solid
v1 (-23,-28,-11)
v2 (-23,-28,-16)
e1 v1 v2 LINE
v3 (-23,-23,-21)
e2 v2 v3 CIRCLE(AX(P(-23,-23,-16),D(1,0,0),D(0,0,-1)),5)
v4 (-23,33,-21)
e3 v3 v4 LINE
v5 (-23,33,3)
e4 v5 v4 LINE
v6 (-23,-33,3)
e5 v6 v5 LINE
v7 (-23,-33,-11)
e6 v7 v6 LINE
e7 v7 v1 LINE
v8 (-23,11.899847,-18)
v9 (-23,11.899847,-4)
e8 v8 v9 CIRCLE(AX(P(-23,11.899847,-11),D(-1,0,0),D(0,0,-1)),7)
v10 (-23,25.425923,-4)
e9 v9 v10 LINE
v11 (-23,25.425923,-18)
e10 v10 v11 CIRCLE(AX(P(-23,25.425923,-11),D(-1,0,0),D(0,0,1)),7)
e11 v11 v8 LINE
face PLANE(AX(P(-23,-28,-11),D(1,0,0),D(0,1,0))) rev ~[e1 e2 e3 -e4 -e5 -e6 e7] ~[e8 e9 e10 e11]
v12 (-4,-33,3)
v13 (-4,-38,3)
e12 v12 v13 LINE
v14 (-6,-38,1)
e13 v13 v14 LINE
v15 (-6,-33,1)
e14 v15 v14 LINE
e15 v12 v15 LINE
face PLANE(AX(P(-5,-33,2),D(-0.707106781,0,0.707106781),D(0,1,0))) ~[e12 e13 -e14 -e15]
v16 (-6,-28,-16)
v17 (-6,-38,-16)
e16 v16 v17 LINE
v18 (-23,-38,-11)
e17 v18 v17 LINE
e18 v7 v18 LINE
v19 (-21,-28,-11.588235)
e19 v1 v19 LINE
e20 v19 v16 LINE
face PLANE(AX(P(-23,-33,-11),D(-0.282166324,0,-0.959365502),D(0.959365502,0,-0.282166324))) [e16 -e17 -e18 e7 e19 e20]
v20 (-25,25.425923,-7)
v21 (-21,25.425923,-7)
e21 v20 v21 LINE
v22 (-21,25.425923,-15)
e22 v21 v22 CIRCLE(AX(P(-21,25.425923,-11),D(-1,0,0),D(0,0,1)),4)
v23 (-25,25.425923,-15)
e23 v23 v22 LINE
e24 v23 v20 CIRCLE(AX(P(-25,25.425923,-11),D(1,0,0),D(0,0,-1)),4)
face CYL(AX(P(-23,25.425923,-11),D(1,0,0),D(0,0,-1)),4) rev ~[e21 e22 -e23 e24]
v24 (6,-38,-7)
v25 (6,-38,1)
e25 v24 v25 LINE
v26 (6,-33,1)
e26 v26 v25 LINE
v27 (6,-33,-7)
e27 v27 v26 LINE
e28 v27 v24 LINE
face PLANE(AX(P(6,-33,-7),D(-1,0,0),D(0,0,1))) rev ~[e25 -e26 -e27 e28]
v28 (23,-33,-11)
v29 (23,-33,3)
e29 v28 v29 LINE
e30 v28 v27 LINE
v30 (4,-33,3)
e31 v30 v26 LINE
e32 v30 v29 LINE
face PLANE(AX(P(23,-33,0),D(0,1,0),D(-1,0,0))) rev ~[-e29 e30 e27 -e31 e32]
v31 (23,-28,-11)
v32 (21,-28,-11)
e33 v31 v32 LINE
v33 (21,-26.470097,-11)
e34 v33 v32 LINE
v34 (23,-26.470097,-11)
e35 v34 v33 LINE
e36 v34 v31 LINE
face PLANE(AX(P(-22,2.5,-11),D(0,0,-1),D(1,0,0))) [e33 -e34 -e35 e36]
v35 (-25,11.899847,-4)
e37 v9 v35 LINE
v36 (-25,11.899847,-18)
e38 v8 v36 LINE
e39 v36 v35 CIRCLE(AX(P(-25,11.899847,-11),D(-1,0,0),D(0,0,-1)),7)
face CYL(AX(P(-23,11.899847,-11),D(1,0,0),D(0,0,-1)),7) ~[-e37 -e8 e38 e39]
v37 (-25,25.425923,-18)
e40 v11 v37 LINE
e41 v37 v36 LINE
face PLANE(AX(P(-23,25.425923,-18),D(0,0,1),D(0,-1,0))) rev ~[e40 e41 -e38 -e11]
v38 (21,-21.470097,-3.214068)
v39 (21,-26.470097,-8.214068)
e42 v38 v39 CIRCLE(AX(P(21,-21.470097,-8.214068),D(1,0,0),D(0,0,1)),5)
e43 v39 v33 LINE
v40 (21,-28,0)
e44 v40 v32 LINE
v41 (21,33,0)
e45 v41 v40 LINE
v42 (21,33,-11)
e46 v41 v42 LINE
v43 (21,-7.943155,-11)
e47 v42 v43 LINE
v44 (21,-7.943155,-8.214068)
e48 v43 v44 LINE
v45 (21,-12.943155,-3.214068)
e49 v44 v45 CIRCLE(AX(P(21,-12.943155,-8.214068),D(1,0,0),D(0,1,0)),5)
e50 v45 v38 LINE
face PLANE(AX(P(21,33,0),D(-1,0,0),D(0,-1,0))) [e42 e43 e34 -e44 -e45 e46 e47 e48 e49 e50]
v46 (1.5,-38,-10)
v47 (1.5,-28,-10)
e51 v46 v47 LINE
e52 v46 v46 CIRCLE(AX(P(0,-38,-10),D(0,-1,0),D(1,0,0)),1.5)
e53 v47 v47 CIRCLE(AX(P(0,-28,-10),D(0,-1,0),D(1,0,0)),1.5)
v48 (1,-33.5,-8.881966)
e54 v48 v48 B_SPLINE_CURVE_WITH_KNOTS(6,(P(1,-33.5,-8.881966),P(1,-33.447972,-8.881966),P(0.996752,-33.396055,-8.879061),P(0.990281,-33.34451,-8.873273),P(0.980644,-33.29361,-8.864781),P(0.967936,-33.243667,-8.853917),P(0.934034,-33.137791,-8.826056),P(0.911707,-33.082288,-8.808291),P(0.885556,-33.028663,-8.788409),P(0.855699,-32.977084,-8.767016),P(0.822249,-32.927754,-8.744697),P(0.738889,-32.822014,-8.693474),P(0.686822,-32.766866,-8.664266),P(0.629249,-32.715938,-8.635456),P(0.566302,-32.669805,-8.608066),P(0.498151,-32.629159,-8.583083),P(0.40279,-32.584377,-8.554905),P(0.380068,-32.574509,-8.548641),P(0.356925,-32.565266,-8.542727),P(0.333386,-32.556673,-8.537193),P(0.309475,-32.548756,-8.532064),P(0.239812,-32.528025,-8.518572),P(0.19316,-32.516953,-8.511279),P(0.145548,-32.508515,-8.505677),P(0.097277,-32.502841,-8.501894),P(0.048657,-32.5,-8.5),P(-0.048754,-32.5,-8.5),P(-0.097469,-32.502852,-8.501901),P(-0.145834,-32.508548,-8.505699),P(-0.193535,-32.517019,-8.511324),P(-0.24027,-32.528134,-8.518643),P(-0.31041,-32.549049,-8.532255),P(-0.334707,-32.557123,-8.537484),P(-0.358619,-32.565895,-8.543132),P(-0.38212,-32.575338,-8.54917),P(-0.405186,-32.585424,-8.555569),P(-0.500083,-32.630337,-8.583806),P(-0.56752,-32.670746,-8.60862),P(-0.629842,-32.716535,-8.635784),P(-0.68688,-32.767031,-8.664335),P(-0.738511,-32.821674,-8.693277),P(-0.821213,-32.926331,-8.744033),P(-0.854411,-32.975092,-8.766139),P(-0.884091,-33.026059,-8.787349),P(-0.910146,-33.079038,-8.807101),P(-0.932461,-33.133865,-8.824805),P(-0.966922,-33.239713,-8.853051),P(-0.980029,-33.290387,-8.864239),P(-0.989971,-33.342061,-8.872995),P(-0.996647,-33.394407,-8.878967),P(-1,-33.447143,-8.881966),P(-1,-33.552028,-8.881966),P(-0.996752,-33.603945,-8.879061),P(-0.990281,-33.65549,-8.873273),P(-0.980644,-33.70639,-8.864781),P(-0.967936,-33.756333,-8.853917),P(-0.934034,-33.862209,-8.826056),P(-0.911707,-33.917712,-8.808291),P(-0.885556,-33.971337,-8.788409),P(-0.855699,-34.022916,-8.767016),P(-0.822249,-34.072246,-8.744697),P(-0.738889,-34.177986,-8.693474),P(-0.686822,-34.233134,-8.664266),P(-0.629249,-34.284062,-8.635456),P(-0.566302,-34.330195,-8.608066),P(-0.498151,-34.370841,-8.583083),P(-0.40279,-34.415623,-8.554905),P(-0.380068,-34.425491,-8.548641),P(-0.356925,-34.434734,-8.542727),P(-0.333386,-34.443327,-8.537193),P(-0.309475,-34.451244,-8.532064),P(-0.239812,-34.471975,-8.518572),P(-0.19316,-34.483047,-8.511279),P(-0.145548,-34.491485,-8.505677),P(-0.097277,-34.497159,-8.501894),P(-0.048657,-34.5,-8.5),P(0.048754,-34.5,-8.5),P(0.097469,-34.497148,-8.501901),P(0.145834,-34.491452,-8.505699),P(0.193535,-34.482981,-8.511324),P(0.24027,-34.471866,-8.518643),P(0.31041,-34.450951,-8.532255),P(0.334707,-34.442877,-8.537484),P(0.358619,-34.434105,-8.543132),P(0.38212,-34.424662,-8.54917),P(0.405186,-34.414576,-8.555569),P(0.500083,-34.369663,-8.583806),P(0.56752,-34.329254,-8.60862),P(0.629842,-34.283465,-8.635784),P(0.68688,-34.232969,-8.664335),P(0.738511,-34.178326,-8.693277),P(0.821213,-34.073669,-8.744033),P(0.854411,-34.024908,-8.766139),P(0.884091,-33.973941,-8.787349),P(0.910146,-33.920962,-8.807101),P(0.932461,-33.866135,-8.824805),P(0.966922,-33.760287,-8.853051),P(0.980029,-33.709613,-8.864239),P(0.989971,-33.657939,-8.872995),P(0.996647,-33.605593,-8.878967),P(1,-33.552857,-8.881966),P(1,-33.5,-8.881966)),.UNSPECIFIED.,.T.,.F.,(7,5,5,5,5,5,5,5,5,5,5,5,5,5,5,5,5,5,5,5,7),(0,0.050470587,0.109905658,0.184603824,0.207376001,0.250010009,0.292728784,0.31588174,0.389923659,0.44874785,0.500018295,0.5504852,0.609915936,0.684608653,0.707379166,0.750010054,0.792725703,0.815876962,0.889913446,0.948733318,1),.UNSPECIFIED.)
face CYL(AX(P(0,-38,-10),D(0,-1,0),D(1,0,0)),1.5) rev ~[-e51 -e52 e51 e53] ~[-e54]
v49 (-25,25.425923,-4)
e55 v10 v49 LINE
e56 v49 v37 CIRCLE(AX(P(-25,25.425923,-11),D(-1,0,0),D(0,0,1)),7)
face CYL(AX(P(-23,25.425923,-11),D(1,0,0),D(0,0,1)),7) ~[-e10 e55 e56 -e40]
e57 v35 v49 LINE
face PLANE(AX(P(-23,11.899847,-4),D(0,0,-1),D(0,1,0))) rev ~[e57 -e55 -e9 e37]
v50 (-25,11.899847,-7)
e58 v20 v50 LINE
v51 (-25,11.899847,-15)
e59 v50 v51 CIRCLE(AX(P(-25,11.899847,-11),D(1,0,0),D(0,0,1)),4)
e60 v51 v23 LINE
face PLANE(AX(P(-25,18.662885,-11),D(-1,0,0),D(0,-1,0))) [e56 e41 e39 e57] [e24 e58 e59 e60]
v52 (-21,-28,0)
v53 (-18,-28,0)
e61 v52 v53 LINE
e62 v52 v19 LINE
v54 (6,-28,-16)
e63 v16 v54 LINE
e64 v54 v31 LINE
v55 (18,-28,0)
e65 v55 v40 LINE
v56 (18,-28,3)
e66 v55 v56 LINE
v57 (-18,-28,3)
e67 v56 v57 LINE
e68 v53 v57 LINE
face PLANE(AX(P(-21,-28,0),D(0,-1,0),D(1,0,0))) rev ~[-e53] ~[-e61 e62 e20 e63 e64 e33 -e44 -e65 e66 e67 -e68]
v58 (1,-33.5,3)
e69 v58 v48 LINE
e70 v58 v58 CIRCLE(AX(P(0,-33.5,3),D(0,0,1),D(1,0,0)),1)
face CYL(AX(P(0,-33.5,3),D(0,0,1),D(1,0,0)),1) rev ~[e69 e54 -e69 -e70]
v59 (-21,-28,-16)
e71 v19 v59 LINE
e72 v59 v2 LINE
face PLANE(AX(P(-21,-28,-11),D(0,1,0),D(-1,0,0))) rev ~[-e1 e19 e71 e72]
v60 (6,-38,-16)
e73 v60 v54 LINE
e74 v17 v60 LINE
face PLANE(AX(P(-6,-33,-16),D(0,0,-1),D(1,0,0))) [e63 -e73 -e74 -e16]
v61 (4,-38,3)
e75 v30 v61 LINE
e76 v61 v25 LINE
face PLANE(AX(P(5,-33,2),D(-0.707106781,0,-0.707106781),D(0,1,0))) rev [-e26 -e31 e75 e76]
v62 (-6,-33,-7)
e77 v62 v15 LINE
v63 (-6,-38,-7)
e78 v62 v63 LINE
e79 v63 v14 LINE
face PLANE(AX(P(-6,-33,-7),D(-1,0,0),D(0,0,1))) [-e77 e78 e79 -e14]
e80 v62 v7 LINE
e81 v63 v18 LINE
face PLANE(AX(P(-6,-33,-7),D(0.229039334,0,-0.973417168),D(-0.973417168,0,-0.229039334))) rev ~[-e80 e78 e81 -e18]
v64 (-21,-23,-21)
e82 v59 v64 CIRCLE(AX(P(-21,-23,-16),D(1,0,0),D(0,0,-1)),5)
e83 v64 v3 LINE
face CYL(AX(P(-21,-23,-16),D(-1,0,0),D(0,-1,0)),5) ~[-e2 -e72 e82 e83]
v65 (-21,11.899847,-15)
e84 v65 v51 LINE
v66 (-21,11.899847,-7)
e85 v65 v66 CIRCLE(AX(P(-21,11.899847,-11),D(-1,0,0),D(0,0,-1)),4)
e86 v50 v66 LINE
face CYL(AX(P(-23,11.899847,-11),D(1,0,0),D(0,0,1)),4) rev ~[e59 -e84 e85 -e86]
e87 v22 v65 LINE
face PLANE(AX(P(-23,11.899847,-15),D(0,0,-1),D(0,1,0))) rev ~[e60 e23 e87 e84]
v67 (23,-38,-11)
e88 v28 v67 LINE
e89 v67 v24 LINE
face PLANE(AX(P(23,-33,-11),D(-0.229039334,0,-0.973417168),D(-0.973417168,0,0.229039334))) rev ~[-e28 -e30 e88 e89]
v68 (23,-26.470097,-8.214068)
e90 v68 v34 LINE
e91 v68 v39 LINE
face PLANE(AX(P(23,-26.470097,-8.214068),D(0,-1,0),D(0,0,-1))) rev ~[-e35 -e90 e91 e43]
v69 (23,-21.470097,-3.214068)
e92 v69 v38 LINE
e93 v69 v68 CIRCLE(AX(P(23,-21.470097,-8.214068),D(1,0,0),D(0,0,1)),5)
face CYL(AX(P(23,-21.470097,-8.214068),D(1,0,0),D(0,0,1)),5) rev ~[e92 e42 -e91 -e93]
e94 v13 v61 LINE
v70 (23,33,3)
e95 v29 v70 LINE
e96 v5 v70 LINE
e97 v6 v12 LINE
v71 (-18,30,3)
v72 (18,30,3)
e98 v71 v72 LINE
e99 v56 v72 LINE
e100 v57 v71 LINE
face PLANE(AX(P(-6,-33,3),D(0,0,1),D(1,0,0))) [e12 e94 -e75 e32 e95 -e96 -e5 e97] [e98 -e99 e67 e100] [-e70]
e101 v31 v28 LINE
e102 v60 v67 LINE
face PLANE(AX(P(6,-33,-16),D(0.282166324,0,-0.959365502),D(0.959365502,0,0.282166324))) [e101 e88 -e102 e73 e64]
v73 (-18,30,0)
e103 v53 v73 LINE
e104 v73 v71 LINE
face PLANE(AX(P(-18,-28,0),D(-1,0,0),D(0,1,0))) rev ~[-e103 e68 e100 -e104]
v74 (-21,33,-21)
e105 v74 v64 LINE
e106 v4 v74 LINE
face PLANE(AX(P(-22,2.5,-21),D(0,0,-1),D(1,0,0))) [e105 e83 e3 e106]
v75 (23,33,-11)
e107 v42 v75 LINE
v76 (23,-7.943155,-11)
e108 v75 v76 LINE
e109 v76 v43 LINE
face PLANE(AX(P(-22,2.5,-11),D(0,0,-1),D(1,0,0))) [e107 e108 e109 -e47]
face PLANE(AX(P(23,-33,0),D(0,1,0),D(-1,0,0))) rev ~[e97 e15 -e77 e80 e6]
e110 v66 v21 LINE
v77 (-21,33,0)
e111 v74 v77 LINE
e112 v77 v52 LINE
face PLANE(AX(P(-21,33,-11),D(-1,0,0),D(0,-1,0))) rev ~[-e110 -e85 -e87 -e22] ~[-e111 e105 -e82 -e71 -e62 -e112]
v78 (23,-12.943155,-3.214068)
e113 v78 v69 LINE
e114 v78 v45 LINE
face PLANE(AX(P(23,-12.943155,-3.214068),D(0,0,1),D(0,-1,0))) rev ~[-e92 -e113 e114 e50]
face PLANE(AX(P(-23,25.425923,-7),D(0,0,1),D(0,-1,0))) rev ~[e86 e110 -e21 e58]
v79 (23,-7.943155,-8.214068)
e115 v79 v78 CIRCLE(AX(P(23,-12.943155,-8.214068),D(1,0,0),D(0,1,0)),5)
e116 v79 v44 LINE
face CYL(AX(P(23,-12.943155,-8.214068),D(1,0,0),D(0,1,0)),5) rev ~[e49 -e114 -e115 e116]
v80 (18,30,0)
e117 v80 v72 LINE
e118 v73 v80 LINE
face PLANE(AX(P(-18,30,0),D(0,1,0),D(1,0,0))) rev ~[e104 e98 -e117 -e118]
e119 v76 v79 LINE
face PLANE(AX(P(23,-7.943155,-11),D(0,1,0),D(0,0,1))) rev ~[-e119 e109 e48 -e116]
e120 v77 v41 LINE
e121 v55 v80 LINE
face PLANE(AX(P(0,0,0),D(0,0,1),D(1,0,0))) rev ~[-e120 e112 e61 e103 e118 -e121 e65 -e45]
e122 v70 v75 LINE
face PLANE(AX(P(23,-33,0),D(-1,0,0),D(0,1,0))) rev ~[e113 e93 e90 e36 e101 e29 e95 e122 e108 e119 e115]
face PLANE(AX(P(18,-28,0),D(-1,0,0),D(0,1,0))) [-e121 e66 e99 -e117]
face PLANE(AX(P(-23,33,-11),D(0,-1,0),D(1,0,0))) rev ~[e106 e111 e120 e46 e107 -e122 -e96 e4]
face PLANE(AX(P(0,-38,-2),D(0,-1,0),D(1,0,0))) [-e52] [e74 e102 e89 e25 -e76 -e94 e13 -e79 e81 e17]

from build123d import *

# Parameters (mm, degrees)
F0_W          = 46
F0_H          = 66
F0_W_2        = 36
F0_H_2        = 58
F1_DEPTH      = 3
F2_W          = 2
F2_H          = 61
F2_H_2        = 5
F3_DEPTH      = 11
F5_DEPTH      = 2
F6_W          = 12
F6_H          = 10
F7_DEPTH      = 5
F7_DEPTH_BACK = 5
F8_R          = 1.5
F9_DEPTH      = 10
F10_R         = 1
F11_DEPTH     = 11.8829661115
F12_DEPTH     = 10
F14_DEPTH     = 2
F16_DEPTH     = 2
F17_R         = 5
F18_SIZE      = 2


with BuildPart() as f1:
    # F0 (on Top) → F1 (new body)
    with BuildSketch(Plane.XY):
        Rectangle(F0_W, F0_H)
        with Locations((0, 1)):
            Rectangle(F0_W_2, F0_H_2, mode=Mode.SUBTRACT)
    extrude(amount=F1_DEPTH)

    # F2 (on face) → F3 (join)
    with BuildSketch(Plane(origin=(0, 0, 0), x_dir=(1, 0, 0), z_dir=(0, 0, -1))):
        with Locations((-22, -2.5)):
            Rectangle(F2_W, F2_H)
        Polygon((18, 28), (21, 28), (21, 33), (-23, 33), (-23, 28), (-21, 28), (-18, 28), align=None)
        with Locations((22, -2.5)):
            Rectangle(F2_W, F2_H)
        with Locations((22, 30.5)):
            Rectangle(F2_W, F2_H_2)
    extrude(amount=F3_DEPTH)

    # F4 (on face) → F5 (cut, through all)
    with BuildSketch(Plane.YZ.offset(23)):
        with BuildLine():
            Line((-26.4700967818, -11), (-7.943155244, -11))
            Line((-7.943155244, -11), (-7.943155244, -8.2140678056))
            ThreePointArc((-7.943155244, -8.2140678056), (-9.4076213381, -4.6785338996), (-12.943155244, -3.2140678056))
            Line((-12.943155244, -3.2140678056), (-21.4700967818, -3.2140678056))
            ThreePointArc((-21.4700967818, -3.2140678056), (-25.0056306878, -4.6785338996), (-26.4700967818, -8.2140678056))
            Line((-26.4700967818, -8.2140678056), (-26.4700967818, -11))
        make_face()
    extrude(amount=-F5_DEPTH, mode=Mode.SUBTRACT)

    # F6 (on face) → F7 (join, two sides)
    with BuildSketch(Plane.XZ.offset(33)) as f7_sk:
        with Locations((0, -2)):
            Rectangle(F6_W, F6_H)
        Polygon((23, -11), (6, -7), (-6, -7), (-23, -11), (-6, -16), (6, -16), align=None)
    extrude(amount=F7_DEPTH)
    extrude(f7_sk.sketch, amount=-F7_DEPTH_BACK)

    # F8 (on face) → F9 (cut, through all)
    with BuildSketch(Plane.XZ.offset(38)):
        with Locations((0, -10)):
            Circle(F8_R)
    extrude(amount=-F9_DEPTH, mode=Mode.SUBTRACT)

    # F10 (on face) → F11 (cut, through all)
    with BuildSketch(Plane.XY.offset(3)):
        with Locations((0, -33.5)):
            Circle(F10_R)
    extrude(amount=-F11_DEPTH, mode=Mode.SUBTRACT)

    # F12 (add): a face of the model
    f12_faces = [f1.faces().sort_by_distance(p)[0] for p in [
        (-22, 2.5, -11),
    ]]
    extrude(f12_faces, amount=F12_DEPTH)

    # F13 (on face) → F14 (cut, through all)
    with BuildSketch(Plane(origin=(-23, 0, 0), x_dir=(0, -1, 0), z_dir=(-1, 0, 0))):
        with BuildLine():
            ThreePointArc((-25.4259229114, -7), (-29.4259229114, -11), (-25.4259229114, -15))
            Line((-25.4259229114, -15), (-11.899846606, -15))
            ThreePointArc((-11.899846606, -15), (-7.899846606, -11), (-11.899846606, -7))
            Line((-11.899846606, -7), (-25.4259229114, -7))
        make_face()
    extrude(amount=-F14_DEPTH, mode=Mode.SUBTRACT)

    # F15 (on face) → F16 (join)
    with BuildSketch(Plane(origin=(-23, 0, 0), x_dir=(0, -1, 0), z_dir=(-1, 0, 0))):
        with BuildLine():
            ThreePointArc((-25.4259229114, -4), (-32.4259229114, -11), (-25.4259229114, -18))
            Line((-25.4259229114, -18), (-11.899846606, -18))
            ThreePointArc((-11.899846606, -18), (-4.899846606, -11), (-11.899846606, -4))
            Line((-11.899846606, -4), (-25.4259229114, -4))
        make_face()
        with BuildLine():
            Line((-11.899846606, -15), (-25.4259229114, -15))
            ThreePointArc((-25.4259229114, -15), (-29.4259229114, -11), (-25.4259229114, -7))
            Line((-25.4259229114, -7), (-11.899846606, -7))
            ThreePointArc((-11.899846606, -7), (-7.899846606, -11), (-11.899846606, -15))
        make_face(mode=Mode.SUBTRACT)
    extrude(amount=F16_DEPTH)

    # F17
    f17_edges = [f1.edges().sort_by_distance(p)[0] for p in [
        (-22, -28, -21),
    ]]
    fillet(f17_edges, radius=F17_R)

    # F18
    f18_edges = [f1.edges().sort_by_distance(p)[0] for p in [
        (6, -35.5, 3),
        (-6, -35.5, 3),
    ]]
    chamfer(f18_edges, length=F18_SIZE)


solid = f1.part
